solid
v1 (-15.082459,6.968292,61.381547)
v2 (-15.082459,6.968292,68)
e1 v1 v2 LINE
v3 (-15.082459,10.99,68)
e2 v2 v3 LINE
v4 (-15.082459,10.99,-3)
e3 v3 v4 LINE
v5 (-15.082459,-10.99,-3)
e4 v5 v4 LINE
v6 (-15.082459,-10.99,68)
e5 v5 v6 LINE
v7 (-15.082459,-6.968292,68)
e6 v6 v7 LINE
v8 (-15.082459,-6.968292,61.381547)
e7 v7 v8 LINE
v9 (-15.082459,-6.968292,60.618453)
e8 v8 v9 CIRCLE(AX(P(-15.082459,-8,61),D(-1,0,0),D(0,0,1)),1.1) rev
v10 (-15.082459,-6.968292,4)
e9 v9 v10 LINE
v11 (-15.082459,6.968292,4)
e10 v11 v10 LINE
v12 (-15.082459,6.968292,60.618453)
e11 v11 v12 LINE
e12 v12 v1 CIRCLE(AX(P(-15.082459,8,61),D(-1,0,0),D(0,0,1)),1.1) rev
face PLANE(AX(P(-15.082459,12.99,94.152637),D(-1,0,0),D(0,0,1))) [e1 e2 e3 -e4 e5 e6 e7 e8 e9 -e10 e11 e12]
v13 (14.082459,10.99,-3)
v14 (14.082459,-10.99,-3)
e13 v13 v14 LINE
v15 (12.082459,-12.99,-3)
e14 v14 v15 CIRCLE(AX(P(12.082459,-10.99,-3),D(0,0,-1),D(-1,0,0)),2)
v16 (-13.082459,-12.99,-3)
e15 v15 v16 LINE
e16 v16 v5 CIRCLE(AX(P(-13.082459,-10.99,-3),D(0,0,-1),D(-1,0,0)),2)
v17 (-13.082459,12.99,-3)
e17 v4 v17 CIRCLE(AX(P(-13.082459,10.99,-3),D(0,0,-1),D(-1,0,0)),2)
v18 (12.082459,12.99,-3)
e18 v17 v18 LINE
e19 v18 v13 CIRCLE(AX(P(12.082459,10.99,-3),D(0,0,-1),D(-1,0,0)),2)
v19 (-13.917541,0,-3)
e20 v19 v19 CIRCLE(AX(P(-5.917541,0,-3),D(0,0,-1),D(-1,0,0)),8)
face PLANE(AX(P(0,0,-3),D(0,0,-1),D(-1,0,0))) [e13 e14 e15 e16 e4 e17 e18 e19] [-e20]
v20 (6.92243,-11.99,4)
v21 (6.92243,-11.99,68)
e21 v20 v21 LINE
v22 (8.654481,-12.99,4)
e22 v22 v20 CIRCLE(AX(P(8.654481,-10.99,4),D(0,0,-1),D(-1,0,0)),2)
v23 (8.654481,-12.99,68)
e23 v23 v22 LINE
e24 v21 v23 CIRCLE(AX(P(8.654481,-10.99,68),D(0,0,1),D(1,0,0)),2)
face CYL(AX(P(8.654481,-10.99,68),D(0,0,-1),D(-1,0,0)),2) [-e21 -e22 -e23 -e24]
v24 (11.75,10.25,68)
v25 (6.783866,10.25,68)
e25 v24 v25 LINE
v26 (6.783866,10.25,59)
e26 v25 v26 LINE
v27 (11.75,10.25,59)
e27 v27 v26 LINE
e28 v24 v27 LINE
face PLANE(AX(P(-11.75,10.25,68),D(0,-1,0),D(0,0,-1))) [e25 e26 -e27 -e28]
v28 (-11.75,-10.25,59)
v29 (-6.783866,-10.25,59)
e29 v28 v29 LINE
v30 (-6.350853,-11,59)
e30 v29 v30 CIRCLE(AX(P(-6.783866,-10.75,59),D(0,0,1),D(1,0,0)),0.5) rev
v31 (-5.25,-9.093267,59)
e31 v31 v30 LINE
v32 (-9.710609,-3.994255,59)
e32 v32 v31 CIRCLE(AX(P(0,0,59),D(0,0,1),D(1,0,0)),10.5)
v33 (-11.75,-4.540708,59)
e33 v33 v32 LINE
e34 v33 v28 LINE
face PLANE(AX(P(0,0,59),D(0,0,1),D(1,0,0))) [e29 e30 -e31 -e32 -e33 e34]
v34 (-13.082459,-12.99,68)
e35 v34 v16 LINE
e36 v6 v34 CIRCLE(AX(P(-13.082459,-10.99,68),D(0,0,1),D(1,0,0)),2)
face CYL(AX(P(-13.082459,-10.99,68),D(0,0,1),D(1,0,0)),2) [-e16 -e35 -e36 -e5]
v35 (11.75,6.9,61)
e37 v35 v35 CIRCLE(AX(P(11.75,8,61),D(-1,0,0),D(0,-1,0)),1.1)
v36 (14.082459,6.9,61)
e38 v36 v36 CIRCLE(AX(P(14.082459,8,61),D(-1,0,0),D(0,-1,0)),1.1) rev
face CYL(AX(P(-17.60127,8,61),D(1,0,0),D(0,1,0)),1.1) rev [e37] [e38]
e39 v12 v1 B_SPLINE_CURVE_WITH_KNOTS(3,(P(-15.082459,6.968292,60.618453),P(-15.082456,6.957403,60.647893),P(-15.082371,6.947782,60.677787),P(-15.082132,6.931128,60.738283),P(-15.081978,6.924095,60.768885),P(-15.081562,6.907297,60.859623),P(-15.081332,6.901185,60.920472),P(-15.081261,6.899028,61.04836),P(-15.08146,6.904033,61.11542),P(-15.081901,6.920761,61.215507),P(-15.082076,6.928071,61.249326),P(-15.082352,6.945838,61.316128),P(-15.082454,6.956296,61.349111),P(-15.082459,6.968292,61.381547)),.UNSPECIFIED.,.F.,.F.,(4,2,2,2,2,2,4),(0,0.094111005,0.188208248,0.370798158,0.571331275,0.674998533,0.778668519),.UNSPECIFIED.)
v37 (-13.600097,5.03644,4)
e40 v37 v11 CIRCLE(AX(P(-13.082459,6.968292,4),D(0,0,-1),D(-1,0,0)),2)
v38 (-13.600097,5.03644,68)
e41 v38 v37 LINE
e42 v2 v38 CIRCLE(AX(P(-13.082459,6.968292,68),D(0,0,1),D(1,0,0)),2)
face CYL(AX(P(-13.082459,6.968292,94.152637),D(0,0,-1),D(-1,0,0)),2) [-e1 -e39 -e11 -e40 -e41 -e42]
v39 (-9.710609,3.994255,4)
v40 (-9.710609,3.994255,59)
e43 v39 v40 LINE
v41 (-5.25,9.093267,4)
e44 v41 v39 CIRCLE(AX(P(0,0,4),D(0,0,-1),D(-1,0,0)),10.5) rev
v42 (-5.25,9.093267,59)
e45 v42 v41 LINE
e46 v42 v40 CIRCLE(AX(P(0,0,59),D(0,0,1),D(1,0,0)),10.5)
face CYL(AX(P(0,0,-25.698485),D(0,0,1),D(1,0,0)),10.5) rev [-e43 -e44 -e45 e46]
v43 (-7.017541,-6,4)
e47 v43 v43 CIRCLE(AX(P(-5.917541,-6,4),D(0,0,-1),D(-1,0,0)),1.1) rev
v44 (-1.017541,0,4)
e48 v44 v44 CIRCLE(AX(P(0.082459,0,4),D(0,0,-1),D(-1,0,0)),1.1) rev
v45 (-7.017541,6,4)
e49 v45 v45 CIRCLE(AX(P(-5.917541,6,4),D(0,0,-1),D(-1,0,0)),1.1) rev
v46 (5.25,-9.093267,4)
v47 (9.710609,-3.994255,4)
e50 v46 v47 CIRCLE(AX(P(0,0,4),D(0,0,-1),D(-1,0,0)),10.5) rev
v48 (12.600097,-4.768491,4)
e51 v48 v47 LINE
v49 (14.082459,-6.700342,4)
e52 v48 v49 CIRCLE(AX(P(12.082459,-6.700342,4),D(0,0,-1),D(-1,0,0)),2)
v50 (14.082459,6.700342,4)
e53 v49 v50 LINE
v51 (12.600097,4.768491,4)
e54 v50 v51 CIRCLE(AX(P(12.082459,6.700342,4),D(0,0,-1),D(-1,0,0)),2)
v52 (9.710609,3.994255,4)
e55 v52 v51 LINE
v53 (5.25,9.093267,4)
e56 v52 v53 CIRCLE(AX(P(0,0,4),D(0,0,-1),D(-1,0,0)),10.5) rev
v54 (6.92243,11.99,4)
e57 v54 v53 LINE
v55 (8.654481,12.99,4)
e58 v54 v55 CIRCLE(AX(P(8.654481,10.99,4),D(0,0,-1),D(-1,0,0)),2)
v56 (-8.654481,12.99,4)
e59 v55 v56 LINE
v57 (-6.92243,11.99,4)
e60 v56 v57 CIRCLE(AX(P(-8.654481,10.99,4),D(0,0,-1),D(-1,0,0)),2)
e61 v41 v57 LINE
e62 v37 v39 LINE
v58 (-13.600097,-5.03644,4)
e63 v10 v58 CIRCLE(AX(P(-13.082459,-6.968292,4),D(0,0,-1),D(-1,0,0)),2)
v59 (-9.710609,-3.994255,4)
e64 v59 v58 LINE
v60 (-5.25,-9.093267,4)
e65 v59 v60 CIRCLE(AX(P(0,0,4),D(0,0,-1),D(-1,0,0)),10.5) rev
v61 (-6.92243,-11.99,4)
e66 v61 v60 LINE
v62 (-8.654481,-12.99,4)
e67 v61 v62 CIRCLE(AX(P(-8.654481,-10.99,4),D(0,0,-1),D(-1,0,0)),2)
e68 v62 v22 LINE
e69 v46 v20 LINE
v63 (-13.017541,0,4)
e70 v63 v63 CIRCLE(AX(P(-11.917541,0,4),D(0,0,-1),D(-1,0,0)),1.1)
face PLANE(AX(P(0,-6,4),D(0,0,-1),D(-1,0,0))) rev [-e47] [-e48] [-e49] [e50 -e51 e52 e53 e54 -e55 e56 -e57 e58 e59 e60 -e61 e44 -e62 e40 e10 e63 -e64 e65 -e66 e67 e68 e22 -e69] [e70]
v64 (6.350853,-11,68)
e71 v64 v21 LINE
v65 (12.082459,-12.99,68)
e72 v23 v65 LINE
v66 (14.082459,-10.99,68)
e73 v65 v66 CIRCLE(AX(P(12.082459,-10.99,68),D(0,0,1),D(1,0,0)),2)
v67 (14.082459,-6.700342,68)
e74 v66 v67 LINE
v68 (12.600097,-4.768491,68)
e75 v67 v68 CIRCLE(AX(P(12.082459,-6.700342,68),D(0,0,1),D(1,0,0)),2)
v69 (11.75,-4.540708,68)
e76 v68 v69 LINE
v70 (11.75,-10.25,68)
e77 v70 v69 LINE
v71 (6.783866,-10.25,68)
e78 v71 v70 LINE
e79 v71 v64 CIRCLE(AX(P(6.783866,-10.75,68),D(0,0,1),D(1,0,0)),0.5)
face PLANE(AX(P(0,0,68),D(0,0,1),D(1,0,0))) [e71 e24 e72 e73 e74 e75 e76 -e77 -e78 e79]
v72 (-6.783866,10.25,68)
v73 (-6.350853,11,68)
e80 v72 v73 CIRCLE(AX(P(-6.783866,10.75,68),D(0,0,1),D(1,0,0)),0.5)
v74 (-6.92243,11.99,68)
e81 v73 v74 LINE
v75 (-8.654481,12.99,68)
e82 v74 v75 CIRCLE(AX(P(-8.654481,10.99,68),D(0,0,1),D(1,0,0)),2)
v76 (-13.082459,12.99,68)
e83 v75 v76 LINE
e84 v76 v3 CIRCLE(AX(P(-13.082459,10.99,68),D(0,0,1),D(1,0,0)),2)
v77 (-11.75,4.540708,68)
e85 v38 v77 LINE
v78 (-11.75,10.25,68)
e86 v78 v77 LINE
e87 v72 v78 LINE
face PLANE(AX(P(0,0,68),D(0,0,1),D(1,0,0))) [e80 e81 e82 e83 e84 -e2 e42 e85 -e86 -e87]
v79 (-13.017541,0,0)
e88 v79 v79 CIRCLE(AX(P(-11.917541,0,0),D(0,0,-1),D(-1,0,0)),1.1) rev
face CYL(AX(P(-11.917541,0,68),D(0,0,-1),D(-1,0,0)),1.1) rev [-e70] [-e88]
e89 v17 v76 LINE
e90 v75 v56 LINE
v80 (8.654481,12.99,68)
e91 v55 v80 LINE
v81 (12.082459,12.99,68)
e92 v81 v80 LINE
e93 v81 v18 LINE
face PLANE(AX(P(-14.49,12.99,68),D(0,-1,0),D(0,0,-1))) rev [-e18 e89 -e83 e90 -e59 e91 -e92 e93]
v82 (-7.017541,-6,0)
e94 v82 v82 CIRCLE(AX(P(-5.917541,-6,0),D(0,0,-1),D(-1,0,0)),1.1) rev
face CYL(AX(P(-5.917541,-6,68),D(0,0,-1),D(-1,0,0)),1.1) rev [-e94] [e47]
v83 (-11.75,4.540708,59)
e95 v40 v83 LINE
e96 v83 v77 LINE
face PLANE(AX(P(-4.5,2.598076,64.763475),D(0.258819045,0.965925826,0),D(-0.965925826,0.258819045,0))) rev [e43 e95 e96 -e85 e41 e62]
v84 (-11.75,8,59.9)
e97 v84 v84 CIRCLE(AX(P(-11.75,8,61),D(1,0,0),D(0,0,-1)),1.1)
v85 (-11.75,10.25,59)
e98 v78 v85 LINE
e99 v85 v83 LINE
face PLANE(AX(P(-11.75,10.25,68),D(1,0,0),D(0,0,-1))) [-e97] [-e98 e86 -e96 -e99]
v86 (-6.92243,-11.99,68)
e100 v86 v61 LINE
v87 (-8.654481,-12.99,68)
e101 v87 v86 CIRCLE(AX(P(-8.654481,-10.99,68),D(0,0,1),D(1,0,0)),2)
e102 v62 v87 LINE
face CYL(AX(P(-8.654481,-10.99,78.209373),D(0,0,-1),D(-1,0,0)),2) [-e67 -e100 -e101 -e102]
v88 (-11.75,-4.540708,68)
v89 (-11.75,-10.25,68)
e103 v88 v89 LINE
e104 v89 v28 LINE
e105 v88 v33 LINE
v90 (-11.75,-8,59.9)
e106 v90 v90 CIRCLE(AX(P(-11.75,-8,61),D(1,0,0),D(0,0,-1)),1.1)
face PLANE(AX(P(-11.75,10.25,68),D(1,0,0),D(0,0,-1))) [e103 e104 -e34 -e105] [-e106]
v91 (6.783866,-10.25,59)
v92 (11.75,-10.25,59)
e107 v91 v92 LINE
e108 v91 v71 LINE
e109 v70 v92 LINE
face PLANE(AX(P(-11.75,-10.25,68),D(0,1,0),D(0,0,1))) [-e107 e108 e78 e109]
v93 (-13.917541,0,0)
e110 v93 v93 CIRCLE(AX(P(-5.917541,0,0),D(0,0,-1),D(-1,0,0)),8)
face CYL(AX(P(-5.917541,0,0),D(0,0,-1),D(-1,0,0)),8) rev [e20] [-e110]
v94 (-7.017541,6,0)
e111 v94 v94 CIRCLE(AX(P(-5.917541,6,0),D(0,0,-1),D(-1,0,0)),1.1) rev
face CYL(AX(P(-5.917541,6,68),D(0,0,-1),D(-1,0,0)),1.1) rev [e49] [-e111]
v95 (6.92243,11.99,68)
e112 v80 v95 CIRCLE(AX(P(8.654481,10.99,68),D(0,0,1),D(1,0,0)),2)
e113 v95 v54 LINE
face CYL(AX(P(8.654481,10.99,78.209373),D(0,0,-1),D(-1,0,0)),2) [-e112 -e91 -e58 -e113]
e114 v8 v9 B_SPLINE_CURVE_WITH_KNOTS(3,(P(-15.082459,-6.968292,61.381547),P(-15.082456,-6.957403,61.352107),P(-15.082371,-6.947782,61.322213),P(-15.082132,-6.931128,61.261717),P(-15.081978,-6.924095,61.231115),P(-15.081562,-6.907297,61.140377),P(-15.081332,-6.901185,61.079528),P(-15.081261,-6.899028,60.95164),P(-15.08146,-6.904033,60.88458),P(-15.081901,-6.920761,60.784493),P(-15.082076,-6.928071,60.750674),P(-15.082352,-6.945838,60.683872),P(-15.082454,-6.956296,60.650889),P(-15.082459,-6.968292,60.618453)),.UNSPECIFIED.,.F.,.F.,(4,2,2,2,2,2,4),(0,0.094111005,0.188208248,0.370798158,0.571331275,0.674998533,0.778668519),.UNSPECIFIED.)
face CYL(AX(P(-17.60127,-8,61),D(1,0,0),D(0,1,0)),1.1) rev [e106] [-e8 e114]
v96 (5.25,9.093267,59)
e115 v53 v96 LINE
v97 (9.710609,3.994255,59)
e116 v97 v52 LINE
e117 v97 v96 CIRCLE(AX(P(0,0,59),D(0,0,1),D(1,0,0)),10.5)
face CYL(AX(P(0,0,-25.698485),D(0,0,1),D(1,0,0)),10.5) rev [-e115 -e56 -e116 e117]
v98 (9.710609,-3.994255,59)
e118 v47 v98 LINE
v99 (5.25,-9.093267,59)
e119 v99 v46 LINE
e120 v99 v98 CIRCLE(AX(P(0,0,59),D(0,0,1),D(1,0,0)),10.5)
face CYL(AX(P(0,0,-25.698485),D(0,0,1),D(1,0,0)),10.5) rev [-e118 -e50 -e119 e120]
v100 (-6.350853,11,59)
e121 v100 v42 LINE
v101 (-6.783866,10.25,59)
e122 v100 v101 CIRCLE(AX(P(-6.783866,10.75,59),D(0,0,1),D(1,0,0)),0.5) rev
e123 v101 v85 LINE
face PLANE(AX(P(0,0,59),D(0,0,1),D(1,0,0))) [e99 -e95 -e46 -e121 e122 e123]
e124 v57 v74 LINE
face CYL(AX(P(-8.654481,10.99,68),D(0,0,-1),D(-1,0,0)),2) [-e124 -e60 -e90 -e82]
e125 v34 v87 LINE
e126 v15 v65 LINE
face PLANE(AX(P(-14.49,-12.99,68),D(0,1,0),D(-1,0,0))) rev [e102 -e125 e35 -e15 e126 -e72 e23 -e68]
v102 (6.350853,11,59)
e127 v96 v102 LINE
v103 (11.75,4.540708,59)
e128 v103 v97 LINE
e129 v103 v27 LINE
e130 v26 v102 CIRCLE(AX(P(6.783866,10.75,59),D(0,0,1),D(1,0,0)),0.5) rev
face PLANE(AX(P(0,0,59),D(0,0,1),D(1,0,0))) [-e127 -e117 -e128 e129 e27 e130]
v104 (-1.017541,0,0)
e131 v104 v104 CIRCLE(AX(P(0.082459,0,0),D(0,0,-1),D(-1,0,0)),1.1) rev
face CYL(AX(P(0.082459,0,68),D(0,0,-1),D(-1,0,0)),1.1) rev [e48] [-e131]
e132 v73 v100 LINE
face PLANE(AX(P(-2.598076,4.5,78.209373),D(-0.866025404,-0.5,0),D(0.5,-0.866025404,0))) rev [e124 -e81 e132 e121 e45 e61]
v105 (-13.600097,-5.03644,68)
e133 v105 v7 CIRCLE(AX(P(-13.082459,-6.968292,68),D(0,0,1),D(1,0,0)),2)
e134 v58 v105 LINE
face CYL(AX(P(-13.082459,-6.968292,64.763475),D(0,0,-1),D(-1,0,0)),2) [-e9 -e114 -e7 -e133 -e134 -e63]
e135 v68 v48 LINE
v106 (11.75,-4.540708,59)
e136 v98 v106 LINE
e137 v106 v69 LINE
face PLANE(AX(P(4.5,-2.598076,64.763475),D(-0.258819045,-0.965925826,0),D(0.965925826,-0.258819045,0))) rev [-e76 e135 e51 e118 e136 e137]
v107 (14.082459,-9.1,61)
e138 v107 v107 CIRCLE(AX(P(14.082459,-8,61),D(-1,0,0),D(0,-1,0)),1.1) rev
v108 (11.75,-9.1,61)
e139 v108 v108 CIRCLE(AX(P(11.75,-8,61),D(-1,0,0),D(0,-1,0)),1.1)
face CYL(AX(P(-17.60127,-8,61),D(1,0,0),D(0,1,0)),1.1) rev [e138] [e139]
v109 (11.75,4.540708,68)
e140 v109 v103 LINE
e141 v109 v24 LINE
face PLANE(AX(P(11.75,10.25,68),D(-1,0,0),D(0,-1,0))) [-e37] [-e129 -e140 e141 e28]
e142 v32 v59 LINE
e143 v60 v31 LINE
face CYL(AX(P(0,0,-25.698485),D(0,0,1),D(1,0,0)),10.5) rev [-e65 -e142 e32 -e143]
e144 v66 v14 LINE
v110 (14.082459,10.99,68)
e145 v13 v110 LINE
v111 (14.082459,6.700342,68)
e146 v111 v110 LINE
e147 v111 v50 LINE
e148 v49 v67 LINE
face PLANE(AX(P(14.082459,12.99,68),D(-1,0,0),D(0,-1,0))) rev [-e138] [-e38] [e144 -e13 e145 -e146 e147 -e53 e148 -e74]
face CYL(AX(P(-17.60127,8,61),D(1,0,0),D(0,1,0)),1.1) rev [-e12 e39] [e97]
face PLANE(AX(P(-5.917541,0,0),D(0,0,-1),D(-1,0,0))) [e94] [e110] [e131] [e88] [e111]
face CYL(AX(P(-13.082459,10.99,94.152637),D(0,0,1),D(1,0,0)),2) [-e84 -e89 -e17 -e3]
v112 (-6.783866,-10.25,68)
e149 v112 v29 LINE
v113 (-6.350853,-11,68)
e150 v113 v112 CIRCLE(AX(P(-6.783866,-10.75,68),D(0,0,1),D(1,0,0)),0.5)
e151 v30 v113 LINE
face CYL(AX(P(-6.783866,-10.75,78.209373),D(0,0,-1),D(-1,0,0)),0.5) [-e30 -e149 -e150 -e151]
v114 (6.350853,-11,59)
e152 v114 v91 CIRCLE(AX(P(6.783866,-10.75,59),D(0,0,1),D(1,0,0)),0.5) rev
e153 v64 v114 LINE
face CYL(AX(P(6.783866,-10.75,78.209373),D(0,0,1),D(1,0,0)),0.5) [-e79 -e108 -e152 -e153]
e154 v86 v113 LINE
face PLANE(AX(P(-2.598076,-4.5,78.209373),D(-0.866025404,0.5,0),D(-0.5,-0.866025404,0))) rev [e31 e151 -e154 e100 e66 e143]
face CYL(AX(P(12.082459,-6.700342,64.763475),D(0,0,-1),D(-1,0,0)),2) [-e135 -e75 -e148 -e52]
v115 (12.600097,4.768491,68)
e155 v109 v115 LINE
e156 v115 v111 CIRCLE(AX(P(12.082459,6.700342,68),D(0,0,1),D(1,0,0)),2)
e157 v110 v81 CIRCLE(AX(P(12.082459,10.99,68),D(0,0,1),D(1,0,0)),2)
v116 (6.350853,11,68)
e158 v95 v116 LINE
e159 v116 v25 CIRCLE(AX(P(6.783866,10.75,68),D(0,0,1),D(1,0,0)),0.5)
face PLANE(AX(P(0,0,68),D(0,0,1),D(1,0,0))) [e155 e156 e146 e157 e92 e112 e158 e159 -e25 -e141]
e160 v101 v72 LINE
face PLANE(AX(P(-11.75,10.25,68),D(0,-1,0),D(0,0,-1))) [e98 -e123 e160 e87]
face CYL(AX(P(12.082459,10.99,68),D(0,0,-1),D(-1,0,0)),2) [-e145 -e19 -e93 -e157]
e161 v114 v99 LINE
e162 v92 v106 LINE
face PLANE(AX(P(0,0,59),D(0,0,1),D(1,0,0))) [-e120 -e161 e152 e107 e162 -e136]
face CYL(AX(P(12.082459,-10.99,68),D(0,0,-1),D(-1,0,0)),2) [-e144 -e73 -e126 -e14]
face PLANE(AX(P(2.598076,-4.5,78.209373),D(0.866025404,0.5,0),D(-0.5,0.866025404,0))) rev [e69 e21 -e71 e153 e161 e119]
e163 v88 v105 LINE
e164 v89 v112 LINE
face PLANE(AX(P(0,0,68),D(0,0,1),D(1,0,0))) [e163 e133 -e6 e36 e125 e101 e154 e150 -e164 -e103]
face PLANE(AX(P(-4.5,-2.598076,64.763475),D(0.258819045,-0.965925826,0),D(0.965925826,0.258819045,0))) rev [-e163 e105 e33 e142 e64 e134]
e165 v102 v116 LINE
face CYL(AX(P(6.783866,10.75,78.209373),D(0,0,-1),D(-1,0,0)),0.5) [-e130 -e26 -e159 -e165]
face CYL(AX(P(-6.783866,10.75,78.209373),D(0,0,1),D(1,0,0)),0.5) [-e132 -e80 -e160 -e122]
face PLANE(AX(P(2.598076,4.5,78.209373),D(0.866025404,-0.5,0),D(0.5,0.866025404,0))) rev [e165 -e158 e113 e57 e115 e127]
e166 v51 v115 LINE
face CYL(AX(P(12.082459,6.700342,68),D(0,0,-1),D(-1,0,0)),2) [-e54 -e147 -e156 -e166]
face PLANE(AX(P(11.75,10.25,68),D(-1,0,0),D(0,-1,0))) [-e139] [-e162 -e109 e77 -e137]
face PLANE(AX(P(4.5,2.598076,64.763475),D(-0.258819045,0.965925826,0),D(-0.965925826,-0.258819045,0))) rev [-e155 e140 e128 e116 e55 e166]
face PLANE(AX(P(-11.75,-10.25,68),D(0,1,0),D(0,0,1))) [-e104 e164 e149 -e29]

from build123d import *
from build123d.topology import SkipClean

# Parameters (mm, degrees)
SKETCH_1_R               = 15
EXTRUDE_1_DEPTH          = 59
SKETCH_2_R               = 1.1
CUT_EXTRUDE_1_DEPTH      = 10
SKETCH_3_W               = 28.98
SKETCH_3_H               = 25.98
SKETCH_3_W_2             = 23.5
SKETCH_3_H_2             = 20.5
EXTRUDE_2_DEPTH          = 9
CUT_EXTRUDE_2_DEPTH      = 55
SKETCH_6_W               = 28.98
SKETCH_6_H               = 25.98
EXTRUDE_6_DEPTH          = 5
CUT_EXTRUDE_3_REACH      = 77.622
SKETCH_7_R               = 1.1
SKETCH_10_R              = 0.8
CUT_EXTRUDE_4_DEPTH      = 68.424031324
CUT_EXTRUDE_5_DEPTH      = 59.017238817
FILLET_1_R               = 0.5
EXTRUDE_7_DEPTH          = 50
SKETCH_17_W              = 0.407540604
SKETCH_17_H              = 25.98
CUT_EXTRUDE_7_DEPTH      = 59.017238817
FILLET_3_R               = 2
CUT_EXTRUDE_6_DEPTH      = 59.017238817
PATTERN_CIRCULAR_4_COUNT = 4
BOSS_EXTRUDE1_START      = 54
BOSS_EXTRUDE1_DEPTH      = 54
CUT_EXTRUDE1_DEPTH       = 72.232015274
SKETCH4_R                = 10
SKETCH4_R_2              = 0.8
BOSS_EXTRUDE2_DEPTH      = 3
FILLET1_R                = 2
SKETCH5_R                = 0.8
BOSS_EXTRUDE3_DEPTH      = 7
BOSS_EXTRUDE4_START      = -7
SKETCH7_R                = 10
BOSS_EXTRUDE4_DEPTH      = 7
SKETCH11_W               = 3
SKETCH11_H               = 25.98
BOSS_EXTRUDE7_DEPTH      = 71
SKETCH6_R                = 1.1
CUT_EXTRUDE2_DEPTH       = 74.737512037
SKETCH8_R                = 10.5
CUT_EXTRUDE5_DEPTH       = 55
SKETCH9_R                = 8
CUT_EXTRUDE6_DEPTH       = 3
CUT_EXTRUDE7_DEPTH       = 64
SKETCH14_R               = 1.1
CUT_EXTRUDE8_DEPTH       = 29.164918793
FILLET2_R                = 2


with BuildPart() as part:
    # 草图1 → 凸台-拉伸1 (new body)
    with BuildSketch(Plane.XY):
        Circle(SKETCH_1_R)
    extrude(amount=EXTRUDE_1_DEPTH)

    # 草图2 → 切除-拉伸1 (cut)
    with BuildSketch(Plane(origin=(0, 0, 0), x_dir=(-1, 0, 0), z_dir=(0, 0, -1))):
        with Locations((0, 6)):
            Circle(SKETCH_2_R)
        with Locations(Location((0, -6, 0), (0, 0, 180))):
            Circle(SKETCH_2_R)
        with Locations((6, 0)):
            Circle(SKETCH_2_R)
        with Locations(Location((-6, 0, 0), (0, 0, 180))):
            Circle(SKETCH_2_R)
    extrude(amount=-CUT_EXTRUDE_1_DEPTH, mode=Mode.SUBTRACT)

    # 草图3 → 凸台-拉伸2 (add)
    with BuildSketch(Plane.XY.offset(59)):
        Rectangle(SKETCH_3_W, SKETCH_3_H)
        Rectangle(SKETCH_3_W_2, SKETCH_3_H_2, mode=Mode.SUBTRACT)
    extrude(amount=EXTRUDE_2_DEPTH)

    # 草图4 → 切除-拉伸2 (cut)
    with BuildSketch(Plane(origin=(0, 0, 4), x_dir=(-1, 0, 0), z_dir=(0, 0, -1))):
        with BuildLine():
            Line((-2.598076211, 4.5), (-7.5, 12.990381057))
            ThreePointArc((-7.5, 12.990381057), (0, 15), (7.5, 12.990381057))
            Line((7.5, 12.990381057), (2.598076211, 4.5))
            ThreePointArc((2.598076211, 4.5), (0, 3), (-2.598076211, 4.5))
        make_face()
        with BuildLine():
            Line((4.5, -2.598076211), (12.990381057, -7.5))
            ThreePointArc((12.990381057, -7.5), (15, 0), (12.990381057, 7.5))
            Line((12.990381057, 7.5), (4.5, 2.598076211))
            ThreePointArc((4.5, 2.598076211), (3, 0), (4.5, -2.598076211))
        make_face()
        with BuildLine():
            Line((-2.598076211, -4.5), (-7.5, -12.990381057))
            ThreePointArc((-7.5, -12.990381057), (0, -15), (7.5, -12.990381057))
            Line((7.5, -12.990381057), (2.598076211, -4.5))
            ThreePointArc((2.598076211, -4.5), (0, -3), (-2.598076211, -4.5))
        make_face()
        with BuildLine():
            Line((-4.5, 2.598076211), (-12.990381057, 7.5))
            ThreePointArc((-12.990381057, 7.5), (-15, 0), (-12.990381057, -7.5))
            Line((-12.990381057, -7.5), (-4.5, -2.598076211))
            ThreePointArc((-4.5, -2.598076211), (-3, 0), (-4.5, 2.598076211))
        make_face()
    extrude(amount=-CUT_EXTRUDE_2_DEPTH, mode=Mode.SUBTRACT)

    # 草图6 → 凸台-拉伸6 (add)
    with BuildSketch(Plane(origin=(0, 0, 59), x_dir=(-1, 0, 0), z_dir=(0, 0, -1))):
        Rectangle(SKETCH_6_W, SKETCH_6_H)
    extrude(amount=EXTRUDE_6_DEPTH)

    # 切除-拉伸3: up to this face of the body (flat: up to its plane)
    cut_extrude_3_end = Plane(part.part.faces().sort_by_distance((-14.49, 0, 61))[0])
    # 草图7 → 切除-拉伸3 (cut, up to the picked face)
    with BuildSketch(Plane(origin=(14.49, 0, 0), x_dir=(0, 0, -1), z_dir=(1, 0, 0)), mode=Mode.PRIVATE) as cut_extrude_3_sk1:
        with Locations(Location((-61, -8, 0), (0, 0, 90))):
            Circle(SKETCH_7_R)
    cut_extrude_3_tool1 = split(extrude(cut_extrude_3_sk1.sketch, amount=-CUT_EXTRUDE_3_REACH, mode=Mode.PRIVATE), bisect_by=cut_extrude_3_end, keep=Keep.BOTH, mode=Mode.PRIVATE)
    # 草图7 → 切除-拉伸3 (cut, up to the picked face)
    with BuildSketch(Plane(origin=(14.49, 0, 0), x_dir=(0, 0, -1), z_dir=(1, 0, 0)), mode=Mode.PRIVATE) as cut_extrude_3_sk2:
        with Locations(Location((-61, 8, 0), (0, 0, 90))):
            Circle(SKETCH_7_R)
    cut_extrude_3_tool2 = split(extrude(cut_extrude_3_sk2.sketch, amount=-CUT_EXTRUDE_3_REACH, mode=Mode.PRIVATE), bisect_by=cut_extrude_3_end, keep=Keep.BOTH, mode=Mode.PRIVATE)
    add(cut_extrude_3_tool1.solids().sort_by(Axis((14.49, -8, 61), (-1, 0, 0)))[0], mode=Mode.SUBTRACT)
    add(cut_extrude_3_tool2.solids().sort_by(Axis((14.49, 8, 61), (-1, 0, 0)))[0], mode=Mode.SUBTRACT)

    # 草图10 → 切除-拉伸4 (cut, through all)
    with BuildSketch(Plane.XY.offset(4)):
        with Locations((0, -12)):
            Circle(SKETCH_10_R)
    cut_extrude_4 = extrude(amount=-CUT_EXTRUDE_4_DEPTH, mode=Mode.SUBTRACT)

    # 草图11 → 切除-拉伸5 (cut, through all)
    with BuildSketch(Plane(origin=(0, 0, 54), x_dir=(-1, 0, 0), z_dir=(0, 0, -1))):
        with BuildLine():
            Line((2.598076211, 4.5), (7.499779997, 12.99))
            Line((7.499779997, 12.99), (-7.499779997, 12.99))
            Line((-7.499779997, 12.99), (-2.598076211, 4.5))
            ThreePointArc((-2.598076211, 4.5), (0, 3), (2.598076211, 4.5))
        make_face()
        with BuildLine():
            Line((-2.598076211, -4.5), (-7.499779997, -12.99))
            Line((-7.499779997, -12.99), (7.499779997, -12.99))
            Line((7.499779997, -12.99), (2.598076211, -4.5))
            ThreePointArc((2.598076211, -4.5), (0, -3), (-2.598076211, -4.5))
        make_face()
    extrude(amount=-CUT_EXTRUDE_5_DEPTH, mode=Mode.SUBTRACT)

    # 圆角1
    fillet_1_edges = [part.edges().sort_by_distance(p)[0] for p in [
        (5.917840259, 10.25, 63.5),
        (-5.917840259, 10.25, 63.5),
        (-5.917840259, -10.25, 63.5),
        (5.917840259, -10.25, 63.5),
    ]]
    fillet(fillet_1_edges, radius=FILLET_1_R)

    # 草图12 → 凸台-拉伸7 (add)
    with SkipClean():  # the faces are left unmerged after this step: merging them gives an invalid solid
        with BuildSketch(Plane.XY.offset(4)):
            with BuildLine():
                Line((-4.5, 2.598076211), (-14.082459396, 5.165688468))
                ThreePointArc((-14.082459396, 5.165688468), (-13.586645102, 6.356341311), (-12.990381057, 7.5))
                Line((-12.990381057, 7.5), (-4.5, 2.598076211))
            make_face()
            with BuildLine():
                Line((-12.990381057, -7.5), (-4.5, -2.598076211))
                Line((-4.5, -2.598076211), (-14.082459396, -5.165688468))
                ThreePointArc((-14.082459396, -5.165688468), (-13.586645102, -6.356341311), (-12.990381057, -7.5))
            make_face()
            with BuildLine():
                Line((4.5, -2.598076211), (14.082459396, -5.165688468))
                ThreePointArc((14.082459396, -5.165688468), (13.586645102, -6.356341311), (12.990381057, -7.5))
                Line((12.990381057, -7.5), (4.5, -2.598076211))
            make_face()
            with BuildLine():
                Line((4.5, 2.598076211), (12.990381057, 7.5))
                ThreePointArc((12.990381057, 7.5), (13.586645102, 6.356341311), (14.082459396, 5.165688468))
                Line((14.082459396, 5.165688468), (4.5, 2.598076211))
            make_face()
        extrude(amount=EXTRUDE_7_DEPTH)

    # 草图17 → 切除-拉伸7 (cut, through all)
    with SkipClean():  # the faces are left unmerged after this step: merging them gives an invalid solid
        with BuildSketch(Plane(origin=(0, 0, 54), x_dir=(-1, 0, 0), z_dir=(0, 0, -1))):
            with Locations((14.286229698, 0)):
                Rectangle(SKETCH_17_W, SKETCH_17_H)
            with Locations((-14.286229698, 0)):
                Rectangle(SKETCH_17_W, SKETCH_17_H)
        extrude(amount=-CUT_EXTRUDE_7_DEPTH, mode=Mode.SUBTRACT)

    # 圆角3
    fillet_3_edges = [part.edges().sort_by_distance(p)[0] for p in [
        (-14.082459396, -12.99, 61),
        (-14.082459396, 12.99, 61),
        (14.082459396, 12.99, 61),
        (14.082459396, -12.99, 61),
    ]]
    fillet(fillet_3_edges, radius=FILLET_3_R)

    # 草图13 → 切除-拉伸6 (cut, through all)
    with SkipClean():  # the faces are left unmerged after this step: merging them gives an invalid solid
        with BuildSketch(Plane(origin=(0, 0, 54), x_dir=(-1, 0, 0), z_dir=(0, 0, -1))):
            with BuildLine():
                Line((-4.5, -2.598076211), (-14.082459396, -5.165688468))
                Line((-14.082459396, -5.165688468), (-14.082459396, 5.165688468))
                Line((-14.082459396, 5.165688468), (-4.5, 2.598076211))
                ThreePointArc((-4.5, 2.598076211), (-3, 0), (-4.5, -2.598076211))
            make_face()
            with BuildLine():
                Line((14.082459396, 5.165688468), (14.082459396, -5.165688468))
                Line((14.082459396, -5.165688468), (4.5, -2.598076211))
                ThreePointArc((4.5, -2.598076211), (3, 0), (4.5, 2.598076211))
                Line((4.5, 2.598076211), (14.082459396, 5.165688468))
            make_face()
        extrude(amount=-CUT_EXTRUDE_6_DEPTH, mode=Mode.SUBTRACT)

    # 阵列(圆周)4: 切除-拉伸4 ×4 about axis
    with SkipClean():  # the faces are left unmerged after this step: merging them gives an invalid solid
        pattern_circular_4_axis = Axis((0, 0, 0), (0, 0, 1))
        for i in range(1, PATTERN_CIRCULAR_4_COUNT):
            add(cut_extrude_4.rotate(pattern_circular_4_axis, i * 360 / PATTERN_CIRCULAR_4_COUNT), mode=Mode.SUBTRACT)

    # Sketch1 → Boss-Extrude1 (add)
    with BuildSketch(Plane(origin=(0, 0, 54), x_dir=(-1, 0, 0), z_dir=(0, 0, -1)).offset(BOSS_EXTRUDE1_START)):
        with BuildLine():
            Line((7.500659971, -12.99), (12.082459396, -12.99))
            ThreePointArc((12.082459396, -12.99), (13.496672959, -12.404213562), (14.082459396, -10.99))
            Line((14.082459396, -10.99), (14.082459396, -5.165688468))
            ThreePointArc((14.082459396, -5.165688468), (11.478794499, -9.655945156), (7.500659971, -12.99))
        make_face()
        with BuildLine():
            Line((-14.082459396, -5.165688468), (-14.082459396, -10.99))
            ThreePointArc((-14.082459396, -10.99), (-13.496672959, -12.404213562), (-12.082459396, -12.99))
            Line((-12.082459396, -12.99), (-7.500659971, -12.99))
            ThreePointArc((-7.500659971, -12.99), (-11.478794499, -9.655945156), (-14.082459396, -5.165688468))
        make_face()
        with BuildLine():
            Line((-7.500659971, 12.99), (-12.082459396, 12.99))
            ThreePointArc((-12.082459396, 12.99), (-13.496672959, 12.404213562), (-14.082459396, 10.99))
            Line((-14.082459396, 10.99), (-14.082459396, 5.165688468))
            ThreePointArc((-14.082459396, 5.165688468), (-11.478794499, 9.655945156), (-7.500659971, 12.99))
        make_face()
        with BuildLine():
            Line((14.082459396, 5.165688468), (14.082459396, 10.99))
            ThreePointArc((14.082459396, 10.99), (13.496672959, 12.404213562), (12.082459396, 12.99))
            Line((12.082459396, 12.99), (7.500659971, 12.99))
            ThreePointArc((7.500659971, 12.99), (11.478794499, 9.655945156), (14.082459396, 5.165688468))
        make_face()
    extrude(amount=-BOSS_EXTRUDE1_DEPTH)

    # Sketch3 → Cut-Extrude1 (cut, through all)
    with BuildSketch(Plane(origin=(0, 0, 0), x_dir=(-1, 0, 0), z_dir=(0, 0, -1))):
        with BuildLine():
            Line((-7.500659971, 12.99), (7.500659971, 12.99))
            ThreePointArc((7.500659971, 12.99), (0, 15), (-7.500659971, 12.99))
        make_face()
        with BuildLine():
            Line((14.082459396, 5.165688468), (14.082459396, -5.165688468))
            ThreePointArc((14.082459396, -5.165688468), (15, 0), (14.082459396, 5.165688468))
        make_face()
        with BuildLine():
            Line((7.500659971, -12.99), (-7.500659971, -12.99))
            ThreePointArc((-7.500659971, -12.99), (0, -15), (7.500659971, -12.99))
        make_face()
        with BuildLine():
            Line((-14.082459396, -5.165688468), (-14.082459396, 5.165688468))
            ThreePointArc((-14.082459396, 5.165688468), (-15, 0), (-14.082459396, -5.165688468))
        make_face()
    extrude(amount=-CUT_EXTRUDE1_DEPTH, mode=Mode.SUBTRACT)

    # Sketch4 → Boss-Extrude2 (add)
    with BuildSketch(Plane(origin=(0, 0, 0), x_dir=(-1, 0, 0), z_dir=(0, 0, -1))):
        with BuildLine():
            Line((-14.082459396, 10.99), (-14.082459396, -10.99))
            ThreePointArc((-14.082459396, -10.99), (-13.496672959, -12.404213562), (-12.082459396, -12.99))
            Line((-12.082459396, -12.99), (12.082459396, -12.99))
            ThreePointArc((12.082459396, -12.99), (13.496672959, -12.404213562), (14.082459396, -10.99))
            Line((14.082459396, -10.99), (14.082459396, 10.99))
            ThreePointArc((14.082459396, 10.99), (13.496672959, 12.404213562), (12.082459396, 12.99))
            Line((12.082459396, 12.99), (-12.082459396, 12.99))
            ThreePointArc((-12.082459396, 12.99), (-13.496672959, 12.404213562), (-14.082459396, 10.99))
        make_face()
        Circle(SKETCH4_R, mode=Mode.SUBTRACT)
        with Locations(Location((0, -12, 0), (0, 0, 180))):
            Circle(SKETCH4_R_2, mode=Mode.SUBTRACT)
        with Locations(Location((12, 0, 0), (0, 0, 270))):
            Circle(SKETCH4_R_2, mode=Mode.SUBTRACT)
        with Locations(Location((-12, 0, 0), (0, 0, 90))):
            Circle(SKETCH4_R_2, mode=Mode.SUBTRACT)
        with Locations((0, 12)):
            Circle(SKETCH4_R_2, mode=Mode.SUBTRACT)
    extrude(amount=BOSS_EXTRUDE2_DEPTH)

    # Fillet1
    fillet1_edges = [part.edges().sort_by_distance(p)[0] for p in [
        (7.499779997, 12.99, 36),
        (-7.499779997, 12.99, 36),
        (-7.499779997, -12.99, 36),
        (7.499779997, -12.99, 36),
        (-14.082459396, -5.165688468, 36),
        (-14.082459396, 5.165688468, 36),
        (14.082459396, 5.165688468, 36),
        (14.082459396, -5.165688468, 36),
    ]]
    fillet(fillet1_edges, radius=FILLET1_R)

    # Sketch5 → Boss-Extrude3 (add)
    with BuildSketch(Plane.XY.offset(4)):
        with Locations((0, -12)):
            Circle(SKETCH5_R)
        with Locations((12, 0)):
            Circle(SKETCH5_R)
        with Locations((0, 12)):
            Circle(SKETCH5_R)
        with Locations((-12, 0)):
            Circle(SKETCH5_R)
    extrude(amount=-BOSS_EXTRUDE3_DEPTH)

    # Sketch7 → Boss-Extrude4 (add)
    with BuildSketch(Plane(origin=(0, 0, -3), x_dir=(-1, 0, 0), z_dir=(0, 0, -1)).offset(BOSS_EXTRUDE4_START)):
        Circle(SKETCH7_R)
    extrude(amount=BOSS_EXTRUDE4_DEPTH)

    # Sketch11 → Boss-Extrude7 (add)
    with BuildSketch(Plane(origin=(0, 0, -3), x_dir=(-1, 0, 0), z_dir=(0, 0, -1))):
        with Locations((13.582459396, 0)):
            Rectangle(SKETCH11_W, SKETCH11_H)
    extrude(amount=-BOSS_EXTRUDE7_DEPTH)

    # Sketch6 → Cut-Extrude2 (cut, through all)
    with BuildSketch(Plane(origin=(0, 0, -3), x_dir=(-1, 0, 0), z_dir=(0, 0, -1))):
        with Locations((11.917540604, 0)):
            Circle(SKETCH6_R)
        with Locations((5.917540604, 6)):
            Circle(SKETCH6_R)
        with Locations((5.917540604, -6)):
            Circle(SKETCH6_R)
        with Locations((-0.082459396, 0)):
            Circle(SKETCH6_R)
    extrude(amount=-CUT_EXTRUDE2_DEPTH, mode=Mode.SUBTRACT)

    # Sketch8 → Cut-Extrude5 (cut)
    with BuildSketch(Plane.XY.offset(59)):
        Circle(SKETCH8_R)
    extrude(amount=-CUT_EXTRUDE5_DEPTH, mode=Mode.SUBTRACT)

    # Sketch9 → Cut-Extrude6 (cut)
    with BuildSketch(Plane(origin=(0, 0, -3), x_dir=(-1, 0, 0), z_dir=(0, 0, -1))):
        with Locations((5.917540604, 0)):
            Circle(SKETCH9_R)
    extrude(amount=-CUT_EXTRUDE6_DEPTH, mode=Mode.SUBTRACT)

    # Sketch12 → Cut-Extrude7 (cut)
    with BuildSketch(Plane.XY.offset(68)):
        Polygon((-11.75, 4.540707856), (-15.082459396, 5.433637661), (-15.082459396, -5.433637661), (-11.75, -4.540707856), align=None)
    extrude(amount=-CUT_EXTRUDE7_DEPTH, mode=Mode.SUBTRACT)

    # Sketch14 → Cut-Extrude8 (cut)
    with BuildSketch(Plane(origin=(14.082459396, 0, 0), x_dir=(0, 0, -1), z_dir=(1, 0, 0))):
        with Locations((-61, 8)):
            Circle(SKETCH14_R)
        with Locations((-61, -8)):
            Circle(SKETCH14_R)
    extrude(amount=-CUT_EXTRUDE8_DEPTH, mode=Mode.SUBTRACT)

    # Fillet2
    # the kernel refuses this fillet: 2 mm, written as the material it takes off along each edge
    with BuildSketch(Plane(origin=(-15.082459396, -12.99, -8), x_dir=(0, 1, 0), z_dir=(0, 0, 1)), Plane(origin=(-15.082459396, 12.99, -8), x_dir=(1, 0, 0), z_dir=(0, 0, 1))) as fillet2_piece_1:
        with BuildLine():
            CenterArc((FILLET2_R, -FILLET2_R), FILLET2_R, 90, 90)
            Line((0, -FILLET2_R), (0, 0))
            Line((0, 0), (FILLET2_R, 0))
        make_face()
    extrude(amount=81, mode=Mode.SUBTRACT)
    with BuildSketch(Plane(origin=(-15.082459396, 5.433637661, 71.83663494), x_dir=(0.965925826289068, -0.2588190451025217, 0), z_dir=(0, 0, -1)), Plane(origin=(-15.082459396, -5.433637661, 71.83663494), x_dir=(0, -1, 0), z_dir=(0, 0, -1))) as fillet2_piece_2:
        with BuildLine():
            CenterArc((FILLET2_R * 0.767326987979, -FILLET2_R), FILLET2_R, 90, 75)
            Line((-FILLET2_R * 0.19859883831, -FILLET2_R * 0.741180954897), (0, 0))
            Line((0, 0), (FILLET2_R * 0.767326987979, 0))
        make_face()
    extrude(amount=67.83663494, mode=Mode.SUBTRACT)


solid = part.part
